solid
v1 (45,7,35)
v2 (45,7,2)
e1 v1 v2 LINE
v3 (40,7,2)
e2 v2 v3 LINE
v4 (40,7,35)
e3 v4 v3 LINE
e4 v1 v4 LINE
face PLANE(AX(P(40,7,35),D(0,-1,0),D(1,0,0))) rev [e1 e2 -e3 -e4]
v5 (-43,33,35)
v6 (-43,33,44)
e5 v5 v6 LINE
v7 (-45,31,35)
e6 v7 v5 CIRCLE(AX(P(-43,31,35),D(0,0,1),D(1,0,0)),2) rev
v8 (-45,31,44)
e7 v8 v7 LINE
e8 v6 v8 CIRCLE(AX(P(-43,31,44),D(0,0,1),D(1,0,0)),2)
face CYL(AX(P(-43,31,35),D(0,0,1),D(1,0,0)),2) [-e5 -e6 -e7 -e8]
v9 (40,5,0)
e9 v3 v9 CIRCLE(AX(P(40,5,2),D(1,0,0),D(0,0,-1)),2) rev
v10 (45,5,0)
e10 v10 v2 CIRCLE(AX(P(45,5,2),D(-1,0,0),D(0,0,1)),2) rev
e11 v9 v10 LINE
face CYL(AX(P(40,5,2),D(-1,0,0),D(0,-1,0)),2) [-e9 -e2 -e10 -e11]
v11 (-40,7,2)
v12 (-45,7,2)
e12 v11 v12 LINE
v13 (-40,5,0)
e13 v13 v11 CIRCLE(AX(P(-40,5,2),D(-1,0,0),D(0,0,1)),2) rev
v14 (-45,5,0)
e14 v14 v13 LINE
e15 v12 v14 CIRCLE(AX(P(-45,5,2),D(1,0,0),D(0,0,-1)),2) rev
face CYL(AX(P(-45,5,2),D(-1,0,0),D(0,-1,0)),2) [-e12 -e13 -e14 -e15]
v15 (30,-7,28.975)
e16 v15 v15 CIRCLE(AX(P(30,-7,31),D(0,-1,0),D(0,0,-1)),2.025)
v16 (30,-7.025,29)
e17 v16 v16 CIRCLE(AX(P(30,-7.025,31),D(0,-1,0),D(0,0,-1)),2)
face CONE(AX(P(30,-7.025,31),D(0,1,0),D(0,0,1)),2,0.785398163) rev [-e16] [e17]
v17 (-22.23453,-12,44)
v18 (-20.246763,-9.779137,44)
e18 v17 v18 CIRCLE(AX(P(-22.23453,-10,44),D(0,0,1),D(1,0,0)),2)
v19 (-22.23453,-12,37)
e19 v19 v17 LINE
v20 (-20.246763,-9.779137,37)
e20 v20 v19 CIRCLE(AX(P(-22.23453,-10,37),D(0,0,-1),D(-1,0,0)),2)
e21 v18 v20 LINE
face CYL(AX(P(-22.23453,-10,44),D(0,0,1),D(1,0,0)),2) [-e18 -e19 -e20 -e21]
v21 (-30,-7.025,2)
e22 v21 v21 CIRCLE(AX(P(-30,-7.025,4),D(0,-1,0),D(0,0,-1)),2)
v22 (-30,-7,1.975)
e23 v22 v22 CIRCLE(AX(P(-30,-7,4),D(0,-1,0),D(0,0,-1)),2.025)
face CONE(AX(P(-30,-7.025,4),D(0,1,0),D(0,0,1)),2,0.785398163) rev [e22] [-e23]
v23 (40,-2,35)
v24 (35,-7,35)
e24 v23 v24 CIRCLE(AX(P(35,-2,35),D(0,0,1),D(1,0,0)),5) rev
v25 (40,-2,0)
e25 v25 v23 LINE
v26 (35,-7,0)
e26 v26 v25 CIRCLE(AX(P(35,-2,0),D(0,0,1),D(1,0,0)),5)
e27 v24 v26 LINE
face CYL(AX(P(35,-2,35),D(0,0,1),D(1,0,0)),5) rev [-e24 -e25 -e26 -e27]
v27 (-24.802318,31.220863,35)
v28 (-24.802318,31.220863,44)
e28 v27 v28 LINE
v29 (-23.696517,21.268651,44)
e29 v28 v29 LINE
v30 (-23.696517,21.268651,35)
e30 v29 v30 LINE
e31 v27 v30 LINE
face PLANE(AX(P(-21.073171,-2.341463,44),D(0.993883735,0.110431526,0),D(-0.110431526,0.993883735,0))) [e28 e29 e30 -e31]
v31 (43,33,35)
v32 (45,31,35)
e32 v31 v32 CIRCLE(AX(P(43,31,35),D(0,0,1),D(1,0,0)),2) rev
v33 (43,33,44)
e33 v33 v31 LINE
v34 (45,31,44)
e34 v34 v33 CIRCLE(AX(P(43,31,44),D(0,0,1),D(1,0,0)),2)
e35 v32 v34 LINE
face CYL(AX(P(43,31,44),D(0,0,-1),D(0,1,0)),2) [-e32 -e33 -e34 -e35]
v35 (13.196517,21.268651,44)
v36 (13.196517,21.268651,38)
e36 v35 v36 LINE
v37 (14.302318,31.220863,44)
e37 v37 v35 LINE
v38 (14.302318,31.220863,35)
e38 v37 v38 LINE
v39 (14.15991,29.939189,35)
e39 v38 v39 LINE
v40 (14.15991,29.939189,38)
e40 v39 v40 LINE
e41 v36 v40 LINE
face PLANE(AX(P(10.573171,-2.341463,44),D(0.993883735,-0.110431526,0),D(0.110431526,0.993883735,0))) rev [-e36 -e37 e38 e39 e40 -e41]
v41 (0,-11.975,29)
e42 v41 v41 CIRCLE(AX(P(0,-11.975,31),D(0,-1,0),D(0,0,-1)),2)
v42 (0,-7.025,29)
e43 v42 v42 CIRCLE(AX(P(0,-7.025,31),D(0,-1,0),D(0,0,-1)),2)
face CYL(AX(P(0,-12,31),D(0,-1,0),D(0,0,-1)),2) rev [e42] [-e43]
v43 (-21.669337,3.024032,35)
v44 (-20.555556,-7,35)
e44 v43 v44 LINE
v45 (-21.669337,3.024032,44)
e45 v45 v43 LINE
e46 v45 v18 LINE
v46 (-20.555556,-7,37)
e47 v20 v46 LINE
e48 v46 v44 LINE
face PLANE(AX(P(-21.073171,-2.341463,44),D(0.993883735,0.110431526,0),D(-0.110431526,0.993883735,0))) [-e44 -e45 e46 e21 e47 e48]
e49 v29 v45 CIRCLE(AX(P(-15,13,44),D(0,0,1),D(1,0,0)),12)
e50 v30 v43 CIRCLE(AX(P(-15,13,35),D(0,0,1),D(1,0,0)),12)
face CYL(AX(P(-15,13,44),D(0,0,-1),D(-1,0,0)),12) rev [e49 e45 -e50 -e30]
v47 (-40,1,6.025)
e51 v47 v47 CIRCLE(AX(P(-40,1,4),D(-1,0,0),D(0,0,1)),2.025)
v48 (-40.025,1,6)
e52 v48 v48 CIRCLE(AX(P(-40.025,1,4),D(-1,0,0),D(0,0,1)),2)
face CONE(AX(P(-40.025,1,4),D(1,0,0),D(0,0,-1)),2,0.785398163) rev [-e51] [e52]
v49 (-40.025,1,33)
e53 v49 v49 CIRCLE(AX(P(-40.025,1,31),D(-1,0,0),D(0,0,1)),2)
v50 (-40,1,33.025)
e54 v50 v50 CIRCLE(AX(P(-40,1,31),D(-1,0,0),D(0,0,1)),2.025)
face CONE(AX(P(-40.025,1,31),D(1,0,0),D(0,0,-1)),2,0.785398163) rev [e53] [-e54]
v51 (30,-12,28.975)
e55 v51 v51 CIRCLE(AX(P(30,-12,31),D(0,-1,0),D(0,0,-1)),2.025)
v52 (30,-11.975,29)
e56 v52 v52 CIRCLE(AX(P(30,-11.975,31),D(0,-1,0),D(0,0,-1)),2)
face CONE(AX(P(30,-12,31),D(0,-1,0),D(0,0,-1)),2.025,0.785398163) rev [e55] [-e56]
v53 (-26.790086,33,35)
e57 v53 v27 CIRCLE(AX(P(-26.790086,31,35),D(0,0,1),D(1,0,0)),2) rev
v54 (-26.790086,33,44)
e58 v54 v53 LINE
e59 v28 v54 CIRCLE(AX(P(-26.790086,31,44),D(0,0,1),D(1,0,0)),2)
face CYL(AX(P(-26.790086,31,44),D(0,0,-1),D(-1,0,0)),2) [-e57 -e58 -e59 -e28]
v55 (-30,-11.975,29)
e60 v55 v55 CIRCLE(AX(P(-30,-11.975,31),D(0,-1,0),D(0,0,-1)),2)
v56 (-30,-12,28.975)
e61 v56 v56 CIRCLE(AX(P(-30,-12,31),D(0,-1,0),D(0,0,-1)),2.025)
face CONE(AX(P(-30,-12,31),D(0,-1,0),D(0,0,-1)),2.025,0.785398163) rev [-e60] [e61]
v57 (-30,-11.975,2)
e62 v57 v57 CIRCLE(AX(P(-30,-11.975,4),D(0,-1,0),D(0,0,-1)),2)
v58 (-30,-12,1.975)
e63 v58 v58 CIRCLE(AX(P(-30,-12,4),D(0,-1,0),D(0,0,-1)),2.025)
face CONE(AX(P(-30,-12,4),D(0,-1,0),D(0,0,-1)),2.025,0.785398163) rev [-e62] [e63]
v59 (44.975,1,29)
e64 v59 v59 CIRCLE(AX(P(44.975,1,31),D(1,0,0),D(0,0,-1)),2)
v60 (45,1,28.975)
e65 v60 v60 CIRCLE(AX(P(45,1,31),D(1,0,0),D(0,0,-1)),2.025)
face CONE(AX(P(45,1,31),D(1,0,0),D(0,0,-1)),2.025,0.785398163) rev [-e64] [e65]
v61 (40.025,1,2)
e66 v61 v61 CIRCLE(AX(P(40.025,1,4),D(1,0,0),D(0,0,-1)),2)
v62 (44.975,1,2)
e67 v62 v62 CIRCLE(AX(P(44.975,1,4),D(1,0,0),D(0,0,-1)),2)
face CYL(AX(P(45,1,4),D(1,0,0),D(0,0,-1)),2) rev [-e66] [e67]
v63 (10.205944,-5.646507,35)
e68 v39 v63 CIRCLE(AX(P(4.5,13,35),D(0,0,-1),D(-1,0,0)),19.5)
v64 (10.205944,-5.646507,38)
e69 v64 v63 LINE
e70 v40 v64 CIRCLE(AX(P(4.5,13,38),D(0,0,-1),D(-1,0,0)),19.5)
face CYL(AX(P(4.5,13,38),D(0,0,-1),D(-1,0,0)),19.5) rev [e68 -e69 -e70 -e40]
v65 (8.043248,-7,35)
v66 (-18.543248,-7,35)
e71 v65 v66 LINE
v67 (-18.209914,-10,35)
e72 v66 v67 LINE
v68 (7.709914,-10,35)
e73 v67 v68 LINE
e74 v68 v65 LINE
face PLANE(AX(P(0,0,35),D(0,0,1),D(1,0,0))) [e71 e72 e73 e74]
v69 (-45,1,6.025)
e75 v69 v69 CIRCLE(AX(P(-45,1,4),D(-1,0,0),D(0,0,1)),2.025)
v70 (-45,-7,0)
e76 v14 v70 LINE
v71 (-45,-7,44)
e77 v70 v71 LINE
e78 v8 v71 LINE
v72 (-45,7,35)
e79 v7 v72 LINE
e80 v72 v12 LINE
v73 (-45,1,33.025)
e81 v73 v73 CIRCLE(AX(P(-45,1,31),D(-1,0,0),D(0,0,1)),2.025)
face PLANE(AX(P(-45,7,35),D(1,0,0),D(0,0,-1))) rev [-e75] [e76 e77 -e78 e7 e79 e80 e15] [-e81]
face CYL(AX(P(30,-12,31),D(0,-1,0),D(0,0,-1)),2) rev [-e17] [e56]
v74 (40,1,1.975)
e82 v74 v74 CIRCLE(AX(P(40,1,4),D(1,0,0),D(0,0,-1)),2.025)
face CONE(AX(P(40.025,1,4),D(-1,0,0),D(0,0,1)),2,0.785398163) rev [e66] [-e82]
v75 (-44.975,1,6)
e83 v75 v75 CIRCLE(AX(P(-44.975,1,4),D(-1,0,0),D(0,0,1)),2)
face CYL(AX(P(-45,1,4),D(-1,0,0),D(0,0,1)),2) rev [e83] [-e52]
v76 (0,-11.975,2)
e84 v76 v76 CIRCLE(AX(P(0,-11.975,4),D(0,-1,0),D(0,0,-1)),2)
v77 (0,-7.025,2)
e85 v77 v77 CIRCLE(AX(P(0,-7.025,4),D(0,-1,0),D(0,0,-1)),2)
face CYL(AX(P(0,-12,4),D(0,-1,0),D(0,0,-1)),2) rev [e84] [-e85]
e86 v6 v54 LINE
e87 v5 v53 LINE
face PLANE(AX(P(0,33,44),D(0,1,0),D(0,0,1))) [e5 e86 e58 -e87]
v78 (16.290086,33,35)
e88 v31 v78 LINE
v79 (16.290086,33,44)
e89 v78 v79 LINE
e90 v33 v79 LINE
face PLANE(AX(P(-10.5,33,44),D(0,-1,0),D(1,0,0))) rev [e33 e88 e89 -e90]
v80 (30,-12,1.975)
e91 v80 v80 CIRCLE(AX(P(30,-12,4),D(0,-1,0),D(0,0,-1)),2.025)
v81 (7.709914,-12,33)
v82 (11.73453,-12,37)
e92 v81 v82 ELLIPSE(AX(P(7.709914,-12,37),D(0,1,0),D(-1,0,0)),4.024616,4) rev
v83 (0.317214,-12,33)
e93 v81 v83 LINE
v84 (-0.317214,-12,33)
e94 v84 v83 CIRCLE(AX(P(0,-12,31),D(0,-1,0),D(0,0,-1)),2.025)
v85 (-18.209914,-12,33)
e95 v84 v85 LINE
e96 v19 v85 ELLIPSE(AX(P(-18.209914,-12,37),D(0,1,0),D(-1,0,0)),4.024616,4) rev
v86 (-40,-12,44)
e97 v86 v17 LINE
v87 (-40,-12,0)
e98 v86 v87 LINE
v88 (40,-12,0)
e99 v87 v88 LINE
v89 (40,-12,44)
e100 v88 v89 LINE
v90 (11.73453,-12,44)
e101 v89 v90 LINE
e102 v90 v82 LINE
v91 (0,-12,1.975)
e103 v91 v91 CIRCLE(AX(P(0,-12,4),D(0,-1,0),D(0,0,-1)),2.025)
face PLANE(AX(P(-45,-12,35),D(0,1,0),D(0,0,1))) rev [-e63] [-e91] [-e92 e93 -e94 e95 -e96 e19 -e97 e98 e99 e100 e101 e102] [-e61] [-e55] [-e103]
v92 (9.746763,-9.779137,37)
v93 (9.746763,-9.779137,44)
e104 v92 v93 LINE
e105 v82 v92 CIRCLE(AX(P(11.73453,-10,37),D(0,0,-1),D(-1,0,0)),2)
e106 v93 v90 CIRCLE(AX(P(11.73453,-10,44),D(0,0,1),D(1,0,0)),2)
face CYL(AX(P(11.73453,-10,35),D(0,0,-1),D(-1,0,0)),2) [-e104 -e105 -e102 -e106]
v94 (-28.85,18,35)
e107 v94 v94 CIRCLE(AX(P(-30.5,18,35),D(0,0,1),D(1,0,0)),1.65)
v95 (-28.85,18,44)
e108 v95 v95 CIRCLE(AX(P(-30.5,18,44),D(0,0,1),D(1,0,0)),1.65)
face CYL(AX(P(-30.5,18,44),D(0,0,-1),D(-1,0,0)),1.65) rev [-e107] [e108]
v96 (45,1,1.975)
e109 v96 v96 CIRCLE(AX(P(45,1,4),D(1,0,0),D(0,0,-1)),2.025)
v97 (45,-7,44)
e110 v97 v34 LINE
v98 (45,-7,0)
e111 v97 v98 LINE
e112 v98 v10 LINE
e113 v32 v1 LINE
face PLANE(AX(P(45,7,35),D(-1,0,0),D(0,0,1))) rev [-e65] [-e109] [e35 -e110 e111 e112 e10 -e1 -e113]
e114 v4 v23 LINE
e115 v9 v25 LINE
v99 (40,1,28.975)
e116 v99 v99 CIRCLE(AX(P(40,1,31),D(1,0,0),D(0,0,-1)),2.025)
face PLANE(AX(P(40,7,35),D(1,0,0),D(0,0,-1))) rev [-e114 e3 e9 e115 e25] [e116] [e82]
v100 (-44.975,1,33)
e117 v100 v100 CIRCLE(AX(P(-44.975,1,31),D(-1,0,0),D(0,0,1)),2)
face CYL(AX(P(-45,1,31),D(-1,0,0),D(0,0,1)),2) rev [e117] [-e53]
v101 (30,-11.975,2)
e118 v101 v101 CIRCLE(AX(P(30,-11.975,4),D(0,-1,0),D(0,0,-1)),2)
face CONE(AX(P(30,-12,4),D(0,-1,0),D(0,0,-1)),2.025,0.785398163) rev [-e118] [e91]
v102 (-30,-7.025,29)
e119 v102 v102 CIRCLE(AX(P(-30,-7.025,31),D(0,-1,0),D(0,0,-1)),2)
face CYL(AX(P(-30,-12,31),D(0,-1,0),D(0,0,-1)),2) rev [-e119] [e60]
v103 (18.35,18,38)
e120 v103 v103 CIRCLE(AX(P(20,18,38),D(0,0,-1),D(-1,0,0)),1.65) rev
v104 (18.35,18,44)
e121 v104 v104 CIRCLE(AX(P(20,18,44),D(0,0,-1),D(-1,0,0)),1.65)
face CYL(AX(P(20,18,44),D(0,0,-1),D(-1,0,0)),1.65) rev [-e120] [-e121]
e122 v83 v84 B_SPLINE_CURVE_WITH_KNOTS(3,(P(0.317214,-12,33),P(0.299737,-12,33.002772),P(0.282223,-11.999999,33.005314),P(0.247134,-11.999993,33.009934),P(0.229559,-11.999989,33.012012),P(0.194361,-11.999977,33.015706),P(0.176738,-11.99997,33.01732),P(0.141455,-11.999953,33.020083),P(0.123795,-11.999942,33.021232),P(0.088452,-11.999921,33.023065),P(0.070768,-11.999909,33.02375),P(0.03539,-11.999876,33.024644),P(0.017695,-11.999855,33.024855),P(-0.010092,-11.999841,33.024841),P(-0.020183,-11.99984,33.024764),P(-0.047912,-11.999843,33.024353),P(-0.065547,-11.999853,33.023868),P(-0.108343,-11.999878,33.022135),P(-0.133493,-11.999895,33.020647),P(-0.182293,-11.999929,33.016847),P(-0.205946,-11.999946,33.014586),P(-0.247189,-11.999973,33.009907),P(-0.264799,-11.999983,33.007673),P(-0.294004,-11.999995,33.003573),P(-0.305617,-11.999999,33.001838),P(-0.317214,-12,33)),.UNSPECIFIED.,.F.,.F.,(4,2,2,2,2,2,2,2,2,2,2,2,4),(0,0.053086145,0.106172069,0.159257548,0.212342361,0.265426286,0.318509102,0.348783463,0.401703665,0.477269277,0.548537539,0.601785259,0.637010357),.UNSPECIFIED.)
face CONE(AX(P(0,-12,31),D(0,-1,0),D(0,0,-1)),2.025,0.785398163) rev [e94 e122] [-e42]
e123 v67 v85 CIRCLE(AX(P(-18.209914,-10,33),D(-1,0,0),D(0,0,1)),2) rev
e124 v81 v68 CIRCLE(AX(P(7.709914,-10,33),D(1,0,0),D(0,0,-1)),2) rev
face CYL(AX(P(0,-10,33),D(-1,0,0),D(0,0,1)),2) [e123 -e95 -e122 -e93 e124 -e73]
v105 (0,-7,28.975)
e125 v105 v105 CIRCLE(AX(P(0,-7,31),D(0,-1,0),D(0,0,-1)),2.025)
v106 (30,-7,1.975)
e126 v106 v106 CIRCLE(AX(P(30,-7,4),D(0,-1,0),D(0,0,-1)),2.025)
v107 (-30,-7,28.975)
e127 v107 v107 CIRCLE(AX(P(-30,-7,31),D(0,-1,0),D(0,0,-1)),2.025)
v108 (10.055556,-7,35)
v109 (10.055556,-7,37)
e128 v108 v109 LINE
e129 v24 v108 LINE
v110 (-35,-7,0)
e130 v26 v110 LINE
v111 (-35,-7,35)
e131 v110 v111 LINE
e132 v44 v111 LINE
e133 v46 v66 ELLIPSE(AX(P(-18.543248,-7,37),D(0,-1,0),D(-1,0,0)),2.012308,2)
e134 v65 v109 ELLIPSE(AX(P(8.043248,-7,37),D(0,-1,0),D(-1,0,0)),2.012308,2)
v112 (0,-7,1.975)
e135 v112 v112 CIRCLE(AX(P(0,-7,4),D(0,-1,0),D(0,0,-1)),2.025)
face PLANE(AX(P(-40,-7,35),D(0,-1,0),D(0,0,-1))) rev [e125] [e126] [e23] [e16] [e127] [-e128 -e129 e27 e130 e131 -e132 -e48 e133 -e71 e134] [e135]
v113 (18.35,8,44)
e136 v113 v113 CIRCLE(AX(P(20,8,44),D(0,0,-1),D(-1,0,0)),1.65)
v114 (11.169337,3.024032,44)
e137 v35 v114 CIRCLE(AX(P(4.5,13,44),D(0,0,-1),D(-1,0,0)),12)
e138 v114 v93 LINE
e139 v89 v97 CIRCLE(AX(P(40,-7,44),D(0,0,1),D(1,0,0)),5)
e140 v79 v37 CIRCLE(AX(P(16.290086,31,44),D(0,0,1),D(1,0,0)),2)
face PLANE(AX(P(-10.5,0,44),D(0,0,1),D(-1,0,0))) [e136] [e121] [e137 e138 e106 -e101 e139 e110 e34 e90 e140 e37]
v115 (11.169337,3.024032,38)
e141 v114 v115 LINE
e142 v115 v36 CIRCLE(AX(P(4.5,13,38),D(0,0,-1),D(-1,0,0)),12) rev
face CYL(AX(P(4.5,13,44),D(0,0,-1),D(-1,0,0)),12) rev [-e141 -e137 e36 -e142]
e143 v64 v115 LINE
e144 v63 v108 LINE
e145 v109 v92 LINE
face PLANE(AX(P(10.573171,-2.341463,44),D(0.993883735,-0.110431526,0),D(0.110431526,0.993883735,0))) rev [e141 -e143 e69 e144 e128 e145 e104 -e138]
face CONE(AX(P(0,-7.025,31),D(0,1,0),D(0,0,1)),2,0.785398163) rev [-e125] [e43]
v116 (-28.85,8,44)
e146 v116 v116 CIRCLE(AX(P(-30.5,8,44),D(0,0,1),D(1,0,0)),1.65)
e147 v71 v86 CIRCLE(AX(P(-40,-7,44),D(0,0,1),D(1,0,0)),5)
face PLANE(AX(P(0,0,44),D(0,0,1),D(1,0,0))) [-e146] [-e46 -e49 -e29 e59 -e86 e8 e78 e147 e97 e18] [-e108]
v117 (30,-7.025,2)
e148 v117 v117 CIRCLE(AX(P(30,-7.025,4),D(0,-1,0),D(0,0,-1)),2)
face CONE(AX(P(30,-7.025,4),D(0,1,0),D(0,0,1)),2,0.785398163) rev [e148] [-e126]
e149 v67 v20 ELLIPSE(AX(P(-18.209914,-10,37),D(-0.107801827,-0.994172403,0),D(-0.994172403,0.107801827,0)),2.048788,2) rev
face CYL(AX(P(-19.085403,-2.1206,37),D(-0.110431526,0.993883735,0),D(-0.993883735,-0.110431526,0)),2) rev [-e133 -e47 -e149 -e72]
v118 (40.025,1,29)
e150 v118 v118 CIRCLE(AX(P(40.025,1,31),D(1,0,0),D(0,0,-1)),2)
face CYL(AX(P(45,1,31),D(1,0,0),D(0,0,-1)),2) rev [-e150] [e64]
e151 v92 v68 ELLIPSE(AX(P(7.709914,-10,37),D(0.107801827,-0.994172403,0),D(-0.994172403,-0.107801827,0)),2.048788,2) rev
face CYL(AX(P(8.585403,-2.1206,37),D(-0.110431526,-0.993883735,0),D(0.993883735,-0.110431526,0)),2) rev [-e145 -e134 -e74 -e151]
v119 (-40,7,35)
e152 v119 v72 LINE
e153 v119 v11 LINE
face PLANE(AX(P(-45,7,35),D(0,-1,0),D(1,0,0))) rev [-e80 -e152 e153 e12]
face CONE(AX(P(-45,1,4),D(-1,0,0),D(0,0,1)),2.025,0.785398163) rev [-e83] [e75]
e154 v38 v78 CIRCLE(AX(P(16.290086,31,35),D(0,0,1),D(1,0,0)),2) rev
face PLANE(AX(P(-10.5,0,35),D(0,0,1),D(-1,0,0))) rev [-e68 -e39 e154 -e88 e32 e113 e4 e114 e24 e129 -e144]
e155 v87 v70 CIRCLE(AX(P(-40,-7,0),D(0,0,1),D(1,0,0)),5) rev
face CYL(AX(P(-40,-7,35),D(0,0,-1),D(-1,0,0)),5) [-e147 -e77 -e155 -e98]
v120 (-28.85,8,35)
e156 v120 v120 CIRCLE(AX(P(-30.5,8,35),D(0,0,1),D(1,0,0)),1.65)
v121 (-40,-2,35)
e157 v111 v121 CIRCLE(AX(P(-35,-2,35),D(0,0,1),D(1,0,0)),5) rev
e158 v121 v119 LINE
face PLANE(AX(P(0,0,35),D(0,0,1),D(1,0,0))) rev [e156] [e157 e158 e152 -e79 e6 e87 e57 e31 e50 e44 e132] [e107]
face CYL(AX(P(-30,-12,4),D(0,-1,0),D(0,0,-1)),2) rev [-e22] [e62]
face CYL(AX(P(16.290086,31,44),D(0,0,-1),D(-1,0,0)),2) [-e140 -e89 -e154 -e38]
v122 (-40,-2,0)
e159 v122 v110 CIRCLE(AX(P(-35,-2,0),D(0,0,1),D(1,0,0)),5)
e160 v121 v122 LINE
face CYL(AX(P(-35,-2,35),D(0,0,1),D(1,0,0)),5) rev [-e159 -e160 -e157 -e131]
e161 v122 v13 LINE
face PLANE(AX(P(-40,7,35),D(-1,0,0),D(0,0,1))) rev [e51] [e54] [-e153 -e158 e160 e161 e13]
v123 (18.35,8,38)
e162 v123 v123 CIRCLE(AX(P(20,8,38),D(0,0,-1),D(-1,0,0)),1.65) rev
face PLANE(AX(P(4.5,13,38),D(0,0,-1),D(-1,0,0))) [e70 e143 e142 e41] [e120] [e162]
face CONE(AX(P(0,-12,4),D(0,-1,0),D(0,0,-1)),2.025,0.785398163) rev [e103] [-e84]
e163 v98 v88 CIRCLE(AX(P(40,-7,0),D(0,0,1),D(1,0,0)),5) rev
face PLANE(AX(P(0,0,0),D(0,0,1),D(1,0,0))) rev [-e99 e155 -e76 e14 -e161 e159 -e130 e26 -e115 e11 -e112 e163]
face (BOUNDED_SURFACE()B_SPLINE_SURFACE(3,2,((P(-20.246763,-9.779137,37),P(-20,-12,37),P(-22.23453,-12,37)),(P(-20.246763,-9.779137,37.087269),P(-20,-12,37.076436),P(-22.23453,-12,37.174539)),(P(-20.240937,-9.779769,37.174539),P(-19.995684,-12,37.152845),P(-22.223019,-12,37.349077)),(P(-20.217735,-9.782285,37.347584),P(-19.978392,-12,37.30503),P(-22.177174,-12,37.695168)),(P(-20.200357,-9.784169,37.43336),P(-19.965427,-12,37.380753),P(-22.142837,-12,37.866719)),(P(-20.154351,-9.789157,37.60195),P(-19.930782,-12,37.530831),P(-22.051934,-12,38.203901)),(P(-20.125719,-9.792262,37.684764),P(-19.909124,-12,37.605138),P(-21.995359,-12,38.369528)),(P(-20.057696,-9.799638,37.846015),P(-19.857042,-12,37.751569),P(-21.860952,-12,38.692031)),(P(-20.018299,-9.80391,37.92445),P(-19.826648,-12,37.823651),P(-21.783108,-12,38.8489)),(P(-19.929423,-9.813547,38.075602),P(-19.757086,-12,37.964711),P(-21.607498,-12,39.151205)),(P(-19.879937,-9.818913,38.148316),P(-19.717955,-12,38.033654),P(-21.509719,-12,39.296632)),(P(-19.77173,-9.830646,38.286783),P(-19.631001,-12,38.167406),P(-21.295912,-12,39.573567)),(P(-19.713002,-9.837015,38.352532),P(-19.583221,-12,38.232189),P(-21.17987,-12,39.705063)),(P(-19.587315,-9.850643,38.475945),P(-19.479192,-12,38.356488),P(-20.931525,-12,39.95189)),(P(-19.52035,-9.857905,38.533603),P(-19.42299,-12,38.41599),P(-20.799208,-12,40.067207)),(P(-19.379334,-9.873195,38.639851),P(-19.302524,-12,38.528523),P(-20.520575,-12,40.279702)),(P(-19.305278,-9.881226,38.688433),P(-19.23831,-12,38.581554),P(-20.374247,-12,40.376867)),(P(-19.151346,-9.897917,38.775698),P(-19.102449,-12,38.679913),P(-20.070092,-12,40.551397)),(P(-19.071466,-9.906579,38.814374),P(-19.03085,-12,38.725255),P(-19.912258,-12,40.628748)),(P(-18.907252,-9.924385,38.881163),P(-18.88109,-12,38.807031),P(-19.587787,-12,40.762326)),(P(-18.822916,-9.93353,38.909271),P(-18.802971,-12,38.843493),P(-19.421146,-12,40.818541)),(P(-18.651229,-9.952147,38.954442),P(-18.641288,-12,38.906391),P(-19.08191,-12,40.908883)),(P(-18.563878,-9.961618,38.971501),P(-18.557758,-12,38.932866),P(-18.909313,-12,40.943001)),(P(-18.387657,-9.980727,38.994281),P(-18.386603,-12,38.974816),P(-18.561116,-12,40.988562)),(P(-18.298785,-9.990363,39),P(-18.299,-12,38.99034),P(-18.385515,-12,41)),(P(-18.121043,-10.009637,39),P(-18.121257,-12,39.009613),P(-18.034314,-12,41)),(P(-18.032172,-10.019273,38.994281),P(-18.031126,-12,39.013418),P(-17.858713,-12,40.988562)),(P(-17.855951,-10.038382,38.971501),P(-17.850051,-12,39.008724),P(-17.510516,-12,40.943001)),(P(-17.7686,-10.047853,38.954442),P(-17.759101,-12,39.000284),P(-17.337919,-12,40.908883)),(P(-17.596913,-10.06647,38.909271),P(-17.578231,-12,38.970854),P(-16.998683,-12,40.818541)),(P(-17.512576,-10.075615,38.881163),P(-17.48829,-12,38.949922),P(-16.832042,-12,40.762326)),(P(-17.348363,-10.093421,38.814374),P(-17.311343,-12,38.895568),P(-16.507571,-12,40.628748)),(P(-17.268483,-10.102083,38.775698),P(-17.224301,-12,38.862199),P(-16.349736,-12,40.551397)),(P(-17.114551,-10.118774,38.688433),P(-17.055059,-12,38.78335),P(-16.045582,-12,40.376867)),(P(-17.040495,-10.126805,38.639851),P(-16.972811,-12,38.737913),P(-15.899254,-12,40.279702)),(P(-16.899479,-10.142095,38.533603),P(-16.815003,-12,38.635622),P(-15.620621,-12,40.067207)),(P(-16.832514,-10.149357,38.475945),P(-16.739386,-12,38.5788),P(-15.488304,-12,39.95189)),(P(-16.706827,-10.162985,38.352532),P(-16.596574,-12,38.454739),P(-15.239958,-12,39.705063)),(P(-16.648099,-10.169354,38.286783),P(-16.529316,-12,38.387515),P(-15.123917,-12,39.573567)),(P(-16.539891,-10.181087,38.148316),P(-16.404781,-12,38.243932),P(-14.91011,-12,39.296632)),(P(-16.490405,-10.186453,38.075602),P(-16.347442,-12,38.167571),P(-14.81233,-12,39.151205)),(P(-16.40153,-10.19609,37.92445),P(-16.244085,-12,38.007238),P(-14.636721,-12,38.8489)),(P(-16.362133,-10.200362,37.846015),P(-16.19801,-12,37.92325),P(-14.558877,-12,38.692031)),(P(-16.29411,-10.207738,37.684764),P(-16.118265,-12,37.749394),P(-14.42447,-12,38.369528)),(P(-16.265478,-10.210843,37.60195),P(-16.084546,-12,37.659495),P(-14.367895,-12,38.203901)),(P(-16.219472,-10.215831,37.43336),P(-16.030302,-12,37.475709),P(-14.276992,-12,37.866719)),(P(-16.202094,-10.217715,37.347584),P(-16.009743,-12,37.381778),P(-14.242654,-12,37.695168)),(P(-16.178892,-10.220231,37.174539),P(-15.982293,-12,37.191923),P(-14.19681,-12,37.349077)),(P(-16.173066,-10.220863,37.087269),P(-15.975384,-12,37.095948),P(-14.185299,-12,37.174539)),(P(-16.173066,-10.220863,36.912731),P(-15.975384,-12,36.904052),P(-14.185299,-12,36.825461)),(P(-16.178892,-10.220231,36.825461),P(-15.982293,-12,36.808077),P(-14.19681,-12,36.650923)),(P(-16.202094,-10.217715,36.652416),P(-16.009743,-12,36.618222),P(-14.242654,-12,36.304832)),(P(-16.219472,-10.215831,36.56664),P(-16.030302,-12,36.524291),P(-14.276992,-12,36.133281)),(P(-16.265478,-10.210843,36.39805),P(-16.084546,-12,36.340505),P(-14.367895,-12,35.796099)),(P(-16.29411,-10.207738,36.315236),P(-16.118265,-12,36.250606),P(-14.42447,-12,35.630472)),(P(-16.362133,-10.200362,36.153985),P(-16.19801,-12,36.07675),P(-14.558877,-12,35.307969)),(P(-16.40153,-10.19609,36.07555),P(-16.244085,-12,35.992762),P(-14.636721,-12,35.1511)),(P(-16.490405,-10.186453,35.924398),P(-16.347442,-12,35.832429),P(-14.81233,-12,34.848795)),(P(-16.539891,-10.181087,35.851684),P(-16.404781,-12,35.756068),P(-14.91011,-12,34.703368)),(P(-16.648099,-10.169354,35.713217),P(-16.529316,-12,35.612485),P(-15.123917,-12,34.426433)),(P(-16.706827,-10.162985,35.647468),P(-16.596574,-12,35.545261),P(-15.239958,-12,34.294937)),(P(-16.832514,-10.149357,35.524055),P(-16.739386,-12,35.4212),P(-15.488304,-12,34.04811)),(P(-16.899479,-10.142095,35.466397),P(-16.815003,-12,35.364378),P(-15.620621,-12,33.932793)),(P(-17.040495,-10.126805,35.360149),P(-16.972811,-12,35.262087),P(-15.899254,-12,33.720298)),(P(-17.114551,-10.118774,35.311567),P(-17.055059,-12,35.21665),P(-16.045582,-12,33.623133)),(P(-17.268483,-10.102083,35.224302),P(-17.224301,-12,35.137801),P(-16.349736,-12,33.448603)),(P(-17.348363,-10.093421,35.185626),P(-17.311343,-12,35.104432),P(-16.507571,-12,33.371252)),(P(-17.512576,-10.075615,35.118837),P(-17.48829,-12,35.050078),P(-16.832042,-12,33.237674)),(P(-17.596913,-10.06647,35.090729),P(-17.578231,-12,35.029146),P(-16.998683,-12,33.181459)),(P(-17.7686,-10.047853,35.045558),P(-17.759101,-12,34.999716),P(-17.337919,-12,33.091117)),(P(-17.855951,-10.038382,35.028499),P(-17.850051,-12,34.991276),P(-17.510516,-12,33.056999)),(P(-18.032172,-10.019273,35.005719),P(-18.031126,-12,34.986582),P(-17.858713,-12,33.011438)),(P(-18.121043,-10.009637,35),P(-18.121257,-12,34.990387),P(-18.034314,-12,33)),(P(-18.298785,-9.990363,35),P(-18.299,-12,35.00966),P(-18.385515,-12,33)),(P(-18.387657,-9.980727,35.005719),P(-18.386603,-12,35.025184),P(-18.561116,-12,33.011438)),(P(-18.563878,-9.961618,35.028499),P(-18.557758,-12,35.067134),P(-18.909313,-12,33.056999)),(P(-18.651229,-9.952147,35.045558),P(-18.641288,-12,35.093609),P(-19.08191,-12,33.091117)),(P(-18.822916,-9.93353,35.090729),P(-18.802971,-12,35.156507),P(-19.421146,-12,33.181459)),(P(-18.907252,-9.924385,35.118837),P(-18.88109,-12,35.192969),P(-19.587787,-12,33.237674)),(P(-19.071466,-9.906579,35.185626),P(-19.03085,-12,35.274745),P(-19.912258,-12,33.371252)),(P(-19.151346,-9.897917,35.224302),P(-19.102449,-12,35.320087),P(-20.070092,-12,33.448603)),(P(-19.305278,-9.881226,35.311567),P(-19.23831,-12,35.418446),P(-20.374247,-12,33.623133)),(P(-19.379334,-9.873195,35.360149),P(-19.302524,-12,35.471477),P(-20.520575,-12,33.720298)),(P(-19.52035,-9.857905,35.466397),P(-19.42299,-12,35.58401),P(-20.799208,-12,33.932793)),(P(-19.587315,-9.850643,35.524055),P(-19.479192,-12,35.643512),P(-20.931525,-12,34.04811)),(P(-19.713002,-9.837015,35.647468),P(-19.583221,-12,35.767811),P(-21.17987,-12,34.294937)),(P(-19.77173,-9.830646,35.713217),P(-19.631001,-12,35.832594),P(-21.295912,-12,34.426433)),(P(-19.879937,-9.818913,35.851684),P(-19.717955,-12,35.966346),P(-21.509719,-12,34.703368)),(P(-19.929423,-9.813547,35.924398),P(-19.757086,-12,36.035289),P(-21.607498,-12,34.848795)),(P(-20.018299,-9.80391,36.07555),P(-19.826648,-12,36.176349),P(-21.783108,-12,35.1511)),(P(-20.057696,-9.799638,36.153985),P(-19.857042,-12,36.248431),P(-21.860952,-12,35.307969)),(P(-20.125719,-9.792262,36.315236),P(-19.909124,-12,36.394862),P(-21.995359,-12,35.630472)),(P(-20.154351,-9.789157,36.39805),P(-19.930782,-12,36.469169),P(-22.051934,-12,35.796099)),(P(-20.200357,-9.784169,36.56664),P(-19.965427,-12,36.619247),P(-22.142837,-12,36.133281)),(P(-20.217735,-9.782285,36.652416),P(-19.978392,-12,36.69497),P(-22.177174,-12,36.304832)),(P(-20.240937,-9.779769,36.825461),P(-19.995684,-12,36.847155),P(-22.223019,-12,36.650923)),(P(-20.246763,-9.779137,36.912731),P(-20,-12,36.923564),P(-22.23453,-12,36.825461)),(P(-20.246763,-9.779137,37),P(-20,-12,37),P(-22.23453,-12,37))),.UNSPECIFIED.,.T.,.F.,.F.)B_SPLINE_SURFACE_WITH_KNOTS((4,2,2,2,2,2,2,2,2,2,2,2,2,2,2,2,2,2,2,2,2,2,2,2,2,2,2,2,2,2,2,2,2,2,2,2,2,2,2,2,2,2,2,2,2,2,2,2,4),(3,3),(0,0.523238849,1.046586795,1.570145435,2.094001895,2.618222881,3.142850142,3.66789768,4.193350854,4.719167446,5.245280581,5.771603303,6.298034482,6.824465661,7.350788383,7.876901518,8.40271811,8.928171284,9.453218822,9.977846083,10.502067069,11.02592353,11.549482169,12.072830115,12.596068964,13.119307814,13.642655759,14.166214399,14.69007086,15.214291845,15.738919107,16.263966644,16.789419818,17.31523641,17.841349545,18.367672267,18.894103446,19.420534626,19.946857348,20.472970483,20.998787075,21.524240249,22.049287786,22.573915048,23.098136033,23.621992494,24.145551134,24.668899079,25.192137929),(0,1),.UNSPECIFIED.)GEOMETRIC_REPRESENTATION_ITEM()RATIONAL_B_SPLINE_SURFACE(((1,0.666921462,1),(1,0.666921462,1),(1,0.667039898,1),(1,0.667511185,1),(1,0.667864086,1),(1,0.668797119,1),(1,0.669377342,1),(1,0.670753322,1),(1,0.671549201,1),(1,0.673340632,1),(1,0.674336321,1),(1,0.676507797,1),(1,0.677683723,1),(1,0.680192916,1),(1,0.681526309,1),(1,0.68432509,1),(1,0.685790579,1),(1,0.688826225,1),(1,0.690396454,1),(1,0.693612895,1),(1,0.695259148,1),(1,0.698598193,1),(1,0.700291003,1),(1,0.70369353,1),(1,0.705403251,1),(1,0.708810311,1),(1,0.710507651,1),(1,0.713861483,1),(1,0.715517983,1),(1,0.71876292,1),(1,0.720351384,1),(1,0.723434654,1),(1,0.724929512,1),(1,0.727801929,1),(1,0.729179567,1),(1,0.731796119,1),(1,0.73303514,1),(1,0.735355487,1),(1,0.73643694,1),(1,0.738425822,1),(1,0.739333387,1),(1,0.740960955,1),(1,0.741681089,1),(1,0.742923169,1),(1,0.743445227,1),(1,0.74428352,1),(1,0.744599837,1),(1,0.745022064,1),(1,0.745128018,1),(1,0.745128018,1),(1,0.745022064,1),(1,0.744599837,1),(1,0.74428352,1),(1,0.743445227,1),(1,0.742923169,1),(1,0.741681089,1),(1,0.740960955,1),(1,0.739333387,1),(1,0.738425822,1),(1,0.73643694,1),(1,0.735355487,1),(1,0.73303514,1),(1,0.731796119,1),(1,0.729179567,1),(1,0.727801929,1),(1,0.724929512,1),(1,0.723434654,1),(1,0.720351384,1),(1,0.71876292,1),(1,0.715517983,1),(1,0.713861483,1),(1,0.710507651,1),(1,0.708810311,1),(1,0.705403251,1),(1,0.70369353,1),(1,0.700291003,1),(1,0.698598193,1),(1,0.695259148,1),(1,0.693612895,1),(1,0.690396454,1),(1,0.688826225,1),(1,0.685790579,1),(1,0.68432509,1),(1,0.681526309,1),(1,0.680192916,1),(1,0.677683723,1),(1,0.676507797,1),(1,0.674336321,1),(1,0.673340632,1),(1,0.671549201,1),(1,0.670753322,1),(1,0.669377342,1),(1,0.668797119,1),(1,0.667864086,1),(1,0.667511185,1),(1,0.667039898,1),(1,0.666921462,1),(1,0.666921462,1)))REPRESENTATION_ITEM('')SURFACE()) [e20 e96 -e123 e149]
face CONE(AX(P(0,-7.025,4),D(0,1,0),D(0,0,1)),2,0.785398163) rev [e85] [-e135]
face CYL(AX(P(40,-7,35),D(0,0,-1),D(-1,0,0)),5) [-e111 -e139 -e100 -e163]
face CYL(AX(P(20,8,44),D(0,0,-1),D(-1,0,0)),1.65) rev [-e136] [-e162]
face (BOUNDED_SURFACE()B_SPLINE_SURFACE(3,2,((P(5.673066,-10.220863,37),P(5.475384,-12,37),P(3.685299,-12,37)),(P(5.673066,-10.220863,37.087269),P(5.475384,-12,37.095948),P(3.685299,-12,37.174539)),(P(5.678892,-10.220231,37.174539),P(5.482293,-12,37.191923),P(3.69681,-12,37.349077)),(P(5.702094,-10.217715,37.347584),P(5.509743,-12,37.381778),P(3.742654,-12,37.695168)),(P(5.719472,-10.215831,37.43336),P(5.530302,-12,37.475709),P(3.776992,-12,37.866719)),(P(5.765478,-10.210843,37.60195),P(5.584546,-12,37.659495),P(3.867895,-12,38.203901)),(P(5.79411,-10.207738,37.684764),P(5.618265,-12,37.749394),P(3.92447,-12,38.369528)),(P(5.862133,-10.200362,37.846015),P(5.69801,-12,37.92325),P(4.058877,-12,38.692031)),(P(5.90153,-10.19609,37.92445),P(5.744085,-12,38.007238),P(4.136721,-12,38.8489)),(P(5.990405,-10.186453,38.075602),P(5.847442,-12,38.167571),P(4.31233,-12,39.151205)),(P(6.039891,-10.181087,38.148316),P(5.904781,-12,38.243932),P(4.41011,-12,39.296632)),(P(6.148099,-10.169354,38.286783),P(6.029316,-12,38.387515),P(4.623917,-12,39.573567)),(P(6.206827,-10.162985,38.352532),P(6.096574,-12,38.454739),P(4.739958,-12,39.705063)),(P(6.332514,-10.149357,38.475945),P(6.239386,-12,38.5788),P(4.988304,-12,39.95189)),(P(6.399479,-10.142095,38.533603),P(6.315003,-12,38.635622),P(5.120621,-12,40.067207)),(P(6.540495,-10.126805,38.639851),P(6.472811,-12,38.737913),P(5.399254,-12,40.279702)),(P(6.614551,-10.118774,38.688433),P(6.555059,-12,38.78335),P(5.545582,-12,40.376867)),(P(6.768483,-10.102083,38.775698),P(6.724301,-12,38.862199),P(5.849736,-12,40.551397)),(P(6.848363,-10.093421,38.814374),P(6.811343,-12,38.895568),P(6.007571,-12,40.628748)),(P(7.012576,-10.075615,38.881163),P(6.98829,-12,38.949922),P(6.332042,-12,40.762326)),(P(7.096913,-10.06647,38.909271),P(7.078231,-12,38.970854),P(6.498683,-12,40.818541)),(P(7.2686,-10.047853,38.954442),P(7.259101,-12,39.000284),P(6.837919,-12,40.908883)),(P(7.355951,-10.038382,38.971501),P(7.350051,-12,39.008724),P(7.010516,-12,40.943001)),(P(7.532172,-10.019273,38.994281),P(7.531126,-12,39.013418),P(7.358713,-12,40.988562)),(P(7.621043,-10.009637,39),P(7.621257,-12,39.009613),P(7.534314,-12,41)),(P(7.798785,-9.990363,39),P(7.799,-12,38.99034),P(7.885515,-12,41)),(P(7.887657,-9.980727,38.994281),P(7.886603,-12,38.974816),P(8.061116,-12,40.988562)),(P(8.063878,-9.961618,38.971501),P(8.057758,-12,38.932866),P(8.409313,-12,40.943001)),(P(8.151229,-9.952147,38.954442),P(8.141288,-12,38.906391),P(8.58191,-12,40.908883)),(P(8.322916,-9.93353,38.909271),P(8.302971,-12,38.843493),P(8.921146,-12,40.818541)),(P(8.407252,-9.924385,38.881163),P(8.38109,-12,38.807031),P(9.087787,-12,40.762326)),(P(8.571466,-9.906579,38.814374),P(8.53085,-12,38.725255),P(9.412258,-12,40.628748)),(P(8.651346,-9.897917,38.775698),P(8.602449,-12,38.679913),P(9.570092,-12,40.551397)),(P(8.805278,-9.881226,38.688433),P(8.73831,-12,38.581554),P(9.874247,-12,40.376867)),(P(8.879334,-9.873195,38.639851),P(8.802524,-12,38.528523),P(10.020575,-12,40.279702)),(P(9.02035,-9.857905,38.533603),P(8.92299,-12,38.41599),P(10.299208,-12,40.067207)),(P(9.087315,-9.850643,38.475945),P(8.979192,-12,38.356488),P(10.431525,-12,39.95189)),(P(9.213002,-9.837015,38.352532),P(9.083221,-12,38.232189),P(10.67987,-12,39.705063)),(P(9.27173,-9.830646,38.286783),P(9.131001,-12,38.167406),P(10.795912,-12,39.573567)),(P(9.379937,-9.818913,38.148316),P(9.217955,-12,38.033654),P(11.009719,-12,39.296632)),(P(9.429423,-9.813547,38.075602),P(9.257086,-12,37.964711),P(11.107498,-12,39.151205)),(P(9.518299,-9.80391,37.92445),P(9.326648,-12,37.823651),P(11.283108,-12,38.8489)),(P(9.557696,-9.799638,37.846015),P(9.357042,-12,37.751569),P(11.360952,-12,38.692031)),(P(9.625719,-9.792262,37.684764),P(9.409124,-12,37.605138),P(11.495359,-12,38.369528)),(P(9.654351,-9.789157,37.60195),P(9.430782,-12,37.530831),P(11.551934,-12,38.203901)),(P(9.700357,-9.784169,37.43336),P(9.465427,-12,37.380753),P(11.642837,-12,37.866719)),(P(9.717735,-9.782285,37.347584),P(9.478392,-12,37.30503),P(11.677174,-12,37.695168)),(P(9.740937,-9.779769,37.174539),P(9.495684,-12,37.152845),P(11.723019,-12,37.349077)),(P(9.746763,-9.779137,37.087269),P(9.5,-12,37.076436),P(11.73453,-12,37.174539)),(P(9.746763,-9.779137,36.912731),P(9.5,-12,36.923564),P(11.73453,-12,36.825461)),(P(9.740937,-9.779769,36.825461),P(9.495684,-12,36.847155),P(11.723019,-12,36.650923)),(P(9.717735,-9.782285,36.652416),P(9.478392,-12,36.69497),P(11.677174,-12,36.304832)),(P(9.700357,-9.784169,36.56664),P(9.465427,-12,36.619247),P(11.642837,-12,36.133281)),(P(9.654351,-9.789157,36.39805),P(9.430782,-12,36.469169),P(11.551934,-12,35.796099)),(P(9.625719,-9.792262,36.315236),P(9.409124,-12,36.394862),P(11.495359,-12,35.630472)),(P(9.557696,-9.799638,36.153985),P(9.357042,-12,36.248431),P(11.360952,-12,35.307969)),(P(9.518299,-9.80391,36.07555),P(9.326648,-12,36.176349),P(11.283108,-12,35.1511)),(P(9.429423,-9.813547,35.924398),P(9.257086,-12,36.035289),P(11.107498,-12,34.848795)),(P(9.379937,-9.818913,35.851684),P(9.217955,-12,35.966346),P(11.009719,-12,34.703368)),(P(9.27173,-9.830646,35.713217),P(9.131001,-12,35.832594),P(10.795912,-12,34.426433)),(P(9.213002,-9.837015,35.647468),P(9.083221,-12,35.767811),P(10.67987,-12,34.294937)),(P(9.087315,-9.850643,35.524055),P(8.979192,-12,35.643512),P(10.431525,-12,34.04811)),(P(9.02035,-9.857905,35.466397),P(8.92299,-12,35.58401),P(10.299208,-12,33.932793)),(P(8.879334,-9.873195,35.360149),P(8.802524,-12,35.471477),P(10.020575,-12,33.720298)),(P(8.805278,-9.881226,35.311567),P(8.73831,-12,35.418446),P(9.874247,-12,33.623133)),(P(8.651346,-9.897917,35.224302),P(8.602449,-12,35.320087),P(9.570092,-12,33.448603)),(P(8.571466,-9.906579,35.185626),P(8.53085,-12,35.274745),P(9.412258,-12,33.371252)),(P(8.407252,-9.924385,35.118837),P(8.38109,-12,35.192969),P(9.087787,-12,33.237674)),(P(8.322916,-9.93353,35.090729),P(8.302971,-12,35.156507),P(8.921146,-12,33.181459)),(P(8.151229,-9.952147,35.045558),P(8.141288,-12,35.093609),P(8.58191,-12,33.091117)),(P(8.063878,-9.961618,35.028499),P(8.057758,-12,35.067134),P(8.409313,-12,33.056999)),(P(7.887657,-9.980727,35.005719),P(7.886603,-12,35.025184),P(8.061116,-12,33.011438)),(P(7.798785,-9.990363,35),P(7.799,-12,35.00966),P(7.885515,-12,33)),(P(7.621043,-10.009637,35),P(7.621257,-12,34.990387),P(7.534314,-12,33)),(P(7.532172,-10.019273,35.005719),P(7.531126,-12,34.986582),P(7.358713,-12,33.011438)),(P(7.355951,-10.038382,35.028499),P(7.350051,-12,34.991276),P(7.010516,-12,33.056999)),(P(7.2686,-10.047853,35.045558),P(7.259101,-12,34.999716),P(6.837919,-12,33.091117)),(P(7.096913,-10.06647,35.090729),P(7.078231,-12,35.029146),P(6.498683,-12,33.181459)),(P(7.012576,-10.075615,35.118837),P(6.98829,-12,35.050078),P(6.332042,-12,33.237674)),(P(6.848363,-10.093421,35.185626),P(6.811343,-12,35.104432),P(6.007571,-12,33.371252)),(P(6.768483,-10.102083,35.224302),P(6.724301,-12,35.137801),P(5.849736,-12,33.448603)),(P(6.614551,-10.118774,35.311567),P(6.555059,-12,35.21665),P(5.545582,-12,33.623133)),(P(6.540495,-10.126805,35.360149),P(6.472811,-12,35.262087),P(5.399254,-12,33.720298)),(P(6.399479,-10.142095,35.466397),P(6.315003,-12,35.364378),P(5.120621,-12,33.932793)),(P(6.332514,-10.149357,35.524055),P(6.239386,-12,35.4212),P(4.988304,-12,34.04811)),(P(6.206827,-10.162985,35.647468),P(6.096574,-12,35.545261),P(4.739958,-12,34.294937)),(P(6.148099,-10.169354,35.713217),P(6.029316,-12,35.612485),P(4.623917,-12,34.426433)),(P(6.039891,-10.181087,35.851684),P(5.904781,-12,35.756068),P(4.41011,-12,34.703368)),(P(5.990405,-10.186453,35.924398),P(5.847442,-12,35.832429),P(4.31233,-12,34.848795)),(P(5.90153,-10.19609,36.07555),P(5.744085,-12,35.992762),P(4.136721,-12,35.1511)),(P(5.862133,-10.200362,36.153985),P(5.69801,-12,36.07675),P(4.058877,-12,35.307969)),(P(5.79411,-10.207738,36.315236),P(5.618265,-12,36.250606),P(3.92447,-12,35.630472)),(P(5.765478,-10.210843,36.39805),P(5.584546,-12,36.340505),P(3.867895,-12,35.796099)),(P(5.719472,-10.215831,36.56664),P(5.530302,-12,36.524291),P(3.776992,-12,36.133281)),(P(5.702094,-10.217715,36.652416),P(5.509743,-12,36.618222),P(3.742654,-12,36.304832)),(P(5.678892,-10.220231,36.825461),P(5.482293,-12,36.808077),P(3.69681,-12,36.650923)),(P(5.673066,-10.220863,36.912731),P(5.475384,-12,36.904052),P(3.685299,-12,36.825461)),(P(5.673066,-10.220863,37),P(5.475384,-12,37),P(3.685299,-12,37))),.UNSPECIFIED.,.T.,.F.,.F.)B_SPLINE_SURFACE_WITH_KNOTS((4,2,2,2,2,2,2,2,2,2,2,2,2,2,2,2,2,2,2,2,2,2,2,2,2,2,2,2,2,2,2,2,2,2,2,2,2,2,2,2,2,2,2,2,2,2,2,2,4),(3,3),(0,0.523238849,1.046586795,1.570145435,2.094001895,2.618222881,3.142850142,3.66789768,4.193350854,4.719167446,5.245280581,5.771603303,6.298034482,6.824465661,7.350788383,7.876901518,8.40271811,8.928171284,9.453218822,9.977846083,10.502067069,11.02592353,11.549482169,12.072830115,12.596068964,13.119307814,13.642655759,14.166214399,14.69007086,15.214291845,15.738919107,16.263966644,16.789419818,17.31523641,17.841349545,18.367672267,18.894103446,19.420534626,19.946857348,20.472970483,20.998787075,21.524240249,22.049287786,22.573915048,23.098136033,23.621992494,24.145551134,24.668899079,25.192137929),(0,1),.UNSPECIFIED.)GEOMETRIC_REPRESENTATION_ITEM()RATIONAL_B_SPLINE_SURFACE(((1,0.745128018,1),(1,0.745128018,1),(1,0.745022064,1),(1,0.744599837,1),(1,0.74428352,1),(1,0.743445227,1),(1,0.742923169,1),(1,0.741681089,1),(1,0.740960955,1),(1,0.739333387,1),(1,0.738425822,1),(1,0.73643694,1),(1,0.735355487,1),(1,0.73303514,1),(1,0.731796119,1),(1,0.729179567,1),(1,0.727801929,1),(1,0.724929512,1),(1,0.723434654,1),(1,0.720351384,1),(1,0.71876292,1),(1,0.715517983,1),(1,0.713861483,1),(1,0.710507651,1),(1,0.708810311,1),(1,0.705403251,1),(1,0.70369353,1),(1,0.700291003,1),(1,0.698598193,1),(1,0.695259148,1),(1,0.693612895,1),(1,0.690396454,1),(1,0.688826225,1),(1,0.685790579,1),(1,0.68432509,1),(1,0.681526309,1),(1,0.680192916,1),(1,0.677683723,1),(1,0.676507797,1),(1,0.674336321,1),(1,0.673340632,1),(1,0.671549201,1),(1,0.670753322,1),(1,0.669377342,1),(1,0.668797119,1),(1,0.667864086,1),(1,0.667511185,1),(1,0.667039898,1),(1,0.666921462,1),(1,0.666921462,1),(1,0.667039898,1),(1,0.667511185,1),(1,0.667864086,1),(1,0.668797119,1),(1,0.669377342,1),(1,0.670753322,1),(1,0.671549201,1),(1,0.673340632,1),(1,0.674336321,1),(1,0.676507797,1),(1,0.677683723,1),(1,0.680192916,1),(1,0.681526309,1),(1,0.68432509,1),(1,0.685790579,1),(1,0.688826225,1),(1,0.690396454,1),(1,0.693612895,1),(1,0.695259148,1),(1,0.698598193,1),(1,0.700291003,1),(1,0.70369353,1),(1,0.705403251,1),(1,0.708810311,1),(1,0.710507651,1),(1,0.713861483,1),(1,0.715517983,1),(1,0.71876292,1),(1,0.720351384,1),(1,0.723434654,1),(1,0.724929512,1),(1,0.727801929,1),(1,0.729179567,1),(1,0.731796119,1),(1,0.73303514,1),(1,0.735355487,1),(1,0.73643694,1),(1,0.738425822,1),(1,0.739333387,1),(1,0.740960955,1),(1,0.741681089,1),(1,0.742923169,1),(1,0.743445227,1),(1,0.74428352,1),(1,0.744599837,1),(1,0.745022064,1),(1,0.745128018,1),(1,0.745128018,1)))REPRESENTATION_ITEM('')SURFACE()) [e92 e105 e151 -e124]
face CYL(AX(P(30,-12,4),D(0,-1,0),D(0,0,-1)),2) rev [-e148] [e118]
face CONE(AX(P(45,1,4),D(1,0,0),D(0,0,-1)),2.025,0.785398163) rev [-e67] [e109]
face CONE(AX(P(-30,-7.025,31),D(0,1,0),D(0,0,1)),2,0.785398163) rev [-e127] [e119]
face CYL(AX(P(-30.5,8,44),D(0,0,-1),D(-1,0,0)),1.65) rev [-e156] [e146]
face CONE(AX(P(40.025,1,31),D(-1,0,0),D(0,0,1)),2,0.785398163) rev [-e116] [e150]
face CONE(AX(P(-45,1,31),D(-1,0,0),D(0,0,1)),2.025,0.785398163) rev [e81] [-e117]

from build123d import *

# Parameters (mm, degrees)
BOSS_EXTRUDE1_DEPTH            = 35
SKETCH2_R                      = 1.65
BOSS_EXTRUDE2_DEPTH            = 9
BOSS_EXTRUDE3_DEPTH            = 10.5
SKETCH5_R                      = 19.5
CUT_EXTRUDE1_DEPTH             = 3
FILLET1_R                      = 5
FILLET2_R                      = 2
F_4_0MM_DOWEL_HOLE2_AT_2_COUNT = 2
F_4_0MM_DOWEL_HOLE2_AT_2_PITCH = 30
F_4_0MM_DOWEL_HOLE2_AT_3_COUNT = 2
F_4_0MM_DOWEL_HOLE2_AT_3_PITCH = 30


with BuildPart() as part:
    # Sketch1 → Boss-Extrude1 (new body)
    with BuildSketch(Plane.XY):
        Polygon((-45, 7), (-45, -12), (45, -12), (45, 7), (40, 7), (40, -7), (-40, -7), (-40, 7), align=None)
    extrude(amount=BOSS_EXTRUDE1_DEPTH)

    # Sketch2 → Boss-Extrude2 (add)
    with BuildSketch(Plane.XY.offset(35)):
        with BuildLine():
            Line((-45, 33), (-45, -12))
            Line((-45, -12), (-20, -12))
            Line((-20, -12), (-21.669336841, 3.024031571))
            ThreePointArc((-21.669336841, 3.024031571), (-26.926604816, 11.674821687), (-23.696516817, 21.268651356))
            Line((-23.696516817, 21.268651356), (-25, 33))
            Line((-25, 33), (-45, 33))
        make_face()
        with Locations((-30.5, 8)):
            Circle(SKETCH2_R, mode=Mode.SUBTRACT)
        with Locations((-30.5, 18)):
            Circle(SKETCH2_R, mode=Mode.SUBTRACT)
    boss_extrude2 = extrude(amount=BOSS_EXTRUDE2_DEPTH)

    # Mirror2: Boss-Extrude2 across plane
    add(boss_extrude2.mirror(Plane(origin=(-5.25, 13.784906966, -116.647939609), x_dir=(0, 0, 1), z_dir=(-1, 0, 0))))

    # Sketch4 → Boss-Extrude3 (add)
    with BuildSketch(Plane(origin=(34.5, 0, 0), x_dir=(0, 0, -1), z_dir=(1, 0, 0))):
        Polygon((-35, -7), (-35, 33), (-44, 33), (-44, -12), (-35, -12), align=None)
    extrude(amount=BOSS_EXTRUDE3_DEPTH)

    # Sketch5 → Cut-Extrude1 (cut)
    with BuildSketch(Plane(origin=(0, 0, 35), x_dir=(-1, 0, 0), z_dir=(0, 0, -1))):
        with Locations((-4.5, 13)):
            Circle(SKETCH5_R)
    extrude(amount=-CUT_EXTRUDE1_DEPTH, mode=Mode.SUBTRACT)

    # Fillet1
    fillet1_edges = [part.edges().sort_by_distance(p)[0] for p in [
        (45, -12, 22),
        (-45, -12, 22),
        (-40, -7, 17.5),
        (40, -7, 17.5),
    ]]
    fillet(fillet1_edges, radius=FILLET1_R)

    # Fillet2
    fillet2_edges = [part.edges().sort_by_distance(p)[0] for p in [
        (-5.25, -12, 35),
        (-45, 33, 39.5),
        (-25, 33, 39.5),
        (45, 33, 39.5),
        (-42.5, 7, 0),
        (42.5, 7, 0),
        (14.5, 33, 39.5),
        (9.777777778, -9.5, 35),
        (-20.277777778, -9.5, 35),
        (-20, -12, 39.5),
        (9.5, -12, 39.5),
    ]]
    fillet(fillet2_edges, radius=FILLET2_R)

    # Sketch6 → Ø4.0mm Dowel Hole2 (revolve, cut)
    with BuildSketch(Plane(origin=(0, -12, 4), x_dir=(0, 0, -1), z_dir=(1, 0, 0))):
        Polygon((0, 0), (0, 5), (2.025, 5), (2, 4.975), (2, 0.025), (2.025, 0), align=None)
    f_4_0mm_dowel_hole2 = revolve(axis=Axis((0, -18.35, 4), (0, 1, 0)), mode=Mode.SUBTRACT)

    # Ø4.0mm Dowel Hole2 at 2: Ø4.0mm Dowel Hole2 ×2
    with Locations(*[(i * F_4_0MM_DOWEL_HOLE2_AT_2_PITCH, 0, 0) for i in range(1, F_4_0MM_DOWEL_HOLE2_AT_2_COUNT)]):
        add(f_4_0mm_dowel_hole2, mode=Mode.SUBTRACT)

    # Ø4.0mm Dowel Hole2 at 3: Ø4.0mm Dowel Hole2 ×2
    with Locations(*[(-i * F_4_0MM_DOWEL_HOLE2_AT_3_PITCH, 0, 0) for i in range(1, F_4_0MM_DOWEL_HOLE2_AT_3_COUNT)]):
        add(f_4_0mm_dowel_hole2, mode=Mode.SUBTRACT)

    # Sketch9 → Ø4.0mm Dowel Hole3 (revolve, cut)
    with BuildSketch(Plane(origin=(45, 1, 4), x_dir=(0, 0, -1), z_dir=(0, 1, 0))):
        Polygon((0, 0), (0, 5), (2.025, 5), (2, 4.975), (2, 0.025), (2.025, 0), align=None)
    f_4_0mm_dowel_hole3 = revolve(axis=Axis((51.35, 1, 4), (-1, 0, 0)), mode=Mode.SUBTRACT)

    # Mirror3: Ø4.0mm Dowel Hole3 across plane
    add(f_4_0mm_dowel_hole3.mirror(Plane(origin=(0, 0, 0), x_dir=(0, 0, 1), z_dir=(1, 0, 0))), mode=Mode.SUBTRACT)

    # Mirror4: Ø4.0mm Dowel Hole2, Ø4.0mm Dowel Hole3 across plane
    add(f_4_0mm_dowel_hole2.mirror(Plane(origin=(0, 0, 17.5), x_dir=(1, 0, 0), z_dir=(0, 0, -1))), mode=Mode.SUBTRACT)
    add(f_4_0mm_dowel_hole3.mirror(Plane(origin=(0, 0, 17.5), x_dir=(1, 0, 0), z_dir=(0, 0, -1))), mode=Mode.SUBTRACT)

    # Mirror4 copy 1 sketch → Mirror4 copy 1 (revolve, cut)
    with BuildSketch(Plane(origin=(30, -12, 31), x_dir=(0, 0, 1), z_dir=(1, 0, 0))):
        Polygon((0, 0), (0, -5), (2.025, -5), (2, -4.975), (2, -0.025), (2.025, 0), align=None)
    revolve(axis=Axis((30, -18.35, 31), (0, -1, 0)), mode=Mode.SUBTRACT)

    # Mirror4 copy 2 sketch → Mirror4 copy 2 (revolve, cut)
    with BuildSketch(Plane(origin=(-30, -12, 31), x_dir=(0, 0, 1), z_dir=(1, 0, 0))):
        Polygon((0, 0), (0, -5), (2.025, -5), (2, -4.975), (2, -0.025), (2.025, 0), align=None)
    revolve(axis=Axis((-30, -18.35, 31), (0, -1, 0)), mode=Mode.SUBTRACT)

    # Mirror4 copy 3 sketch → Mirror4 copy 3 (revolve, cut)
    with BuildSketch(Plane(origin=(-45, 1, 31), x_dir=(0, 0, 1), z_dir=(0, 1, 0))):
        Polygon((0, 0), (0, 5), (2.025, 5), (2, 4.975), (2, 0.025), (2.025, 0), align=None)
    revolve(axis=Axis((-51.35, 1, 31), (1, 0, 0)), mode=Mode.SUBTRACT)


solid = part.part
